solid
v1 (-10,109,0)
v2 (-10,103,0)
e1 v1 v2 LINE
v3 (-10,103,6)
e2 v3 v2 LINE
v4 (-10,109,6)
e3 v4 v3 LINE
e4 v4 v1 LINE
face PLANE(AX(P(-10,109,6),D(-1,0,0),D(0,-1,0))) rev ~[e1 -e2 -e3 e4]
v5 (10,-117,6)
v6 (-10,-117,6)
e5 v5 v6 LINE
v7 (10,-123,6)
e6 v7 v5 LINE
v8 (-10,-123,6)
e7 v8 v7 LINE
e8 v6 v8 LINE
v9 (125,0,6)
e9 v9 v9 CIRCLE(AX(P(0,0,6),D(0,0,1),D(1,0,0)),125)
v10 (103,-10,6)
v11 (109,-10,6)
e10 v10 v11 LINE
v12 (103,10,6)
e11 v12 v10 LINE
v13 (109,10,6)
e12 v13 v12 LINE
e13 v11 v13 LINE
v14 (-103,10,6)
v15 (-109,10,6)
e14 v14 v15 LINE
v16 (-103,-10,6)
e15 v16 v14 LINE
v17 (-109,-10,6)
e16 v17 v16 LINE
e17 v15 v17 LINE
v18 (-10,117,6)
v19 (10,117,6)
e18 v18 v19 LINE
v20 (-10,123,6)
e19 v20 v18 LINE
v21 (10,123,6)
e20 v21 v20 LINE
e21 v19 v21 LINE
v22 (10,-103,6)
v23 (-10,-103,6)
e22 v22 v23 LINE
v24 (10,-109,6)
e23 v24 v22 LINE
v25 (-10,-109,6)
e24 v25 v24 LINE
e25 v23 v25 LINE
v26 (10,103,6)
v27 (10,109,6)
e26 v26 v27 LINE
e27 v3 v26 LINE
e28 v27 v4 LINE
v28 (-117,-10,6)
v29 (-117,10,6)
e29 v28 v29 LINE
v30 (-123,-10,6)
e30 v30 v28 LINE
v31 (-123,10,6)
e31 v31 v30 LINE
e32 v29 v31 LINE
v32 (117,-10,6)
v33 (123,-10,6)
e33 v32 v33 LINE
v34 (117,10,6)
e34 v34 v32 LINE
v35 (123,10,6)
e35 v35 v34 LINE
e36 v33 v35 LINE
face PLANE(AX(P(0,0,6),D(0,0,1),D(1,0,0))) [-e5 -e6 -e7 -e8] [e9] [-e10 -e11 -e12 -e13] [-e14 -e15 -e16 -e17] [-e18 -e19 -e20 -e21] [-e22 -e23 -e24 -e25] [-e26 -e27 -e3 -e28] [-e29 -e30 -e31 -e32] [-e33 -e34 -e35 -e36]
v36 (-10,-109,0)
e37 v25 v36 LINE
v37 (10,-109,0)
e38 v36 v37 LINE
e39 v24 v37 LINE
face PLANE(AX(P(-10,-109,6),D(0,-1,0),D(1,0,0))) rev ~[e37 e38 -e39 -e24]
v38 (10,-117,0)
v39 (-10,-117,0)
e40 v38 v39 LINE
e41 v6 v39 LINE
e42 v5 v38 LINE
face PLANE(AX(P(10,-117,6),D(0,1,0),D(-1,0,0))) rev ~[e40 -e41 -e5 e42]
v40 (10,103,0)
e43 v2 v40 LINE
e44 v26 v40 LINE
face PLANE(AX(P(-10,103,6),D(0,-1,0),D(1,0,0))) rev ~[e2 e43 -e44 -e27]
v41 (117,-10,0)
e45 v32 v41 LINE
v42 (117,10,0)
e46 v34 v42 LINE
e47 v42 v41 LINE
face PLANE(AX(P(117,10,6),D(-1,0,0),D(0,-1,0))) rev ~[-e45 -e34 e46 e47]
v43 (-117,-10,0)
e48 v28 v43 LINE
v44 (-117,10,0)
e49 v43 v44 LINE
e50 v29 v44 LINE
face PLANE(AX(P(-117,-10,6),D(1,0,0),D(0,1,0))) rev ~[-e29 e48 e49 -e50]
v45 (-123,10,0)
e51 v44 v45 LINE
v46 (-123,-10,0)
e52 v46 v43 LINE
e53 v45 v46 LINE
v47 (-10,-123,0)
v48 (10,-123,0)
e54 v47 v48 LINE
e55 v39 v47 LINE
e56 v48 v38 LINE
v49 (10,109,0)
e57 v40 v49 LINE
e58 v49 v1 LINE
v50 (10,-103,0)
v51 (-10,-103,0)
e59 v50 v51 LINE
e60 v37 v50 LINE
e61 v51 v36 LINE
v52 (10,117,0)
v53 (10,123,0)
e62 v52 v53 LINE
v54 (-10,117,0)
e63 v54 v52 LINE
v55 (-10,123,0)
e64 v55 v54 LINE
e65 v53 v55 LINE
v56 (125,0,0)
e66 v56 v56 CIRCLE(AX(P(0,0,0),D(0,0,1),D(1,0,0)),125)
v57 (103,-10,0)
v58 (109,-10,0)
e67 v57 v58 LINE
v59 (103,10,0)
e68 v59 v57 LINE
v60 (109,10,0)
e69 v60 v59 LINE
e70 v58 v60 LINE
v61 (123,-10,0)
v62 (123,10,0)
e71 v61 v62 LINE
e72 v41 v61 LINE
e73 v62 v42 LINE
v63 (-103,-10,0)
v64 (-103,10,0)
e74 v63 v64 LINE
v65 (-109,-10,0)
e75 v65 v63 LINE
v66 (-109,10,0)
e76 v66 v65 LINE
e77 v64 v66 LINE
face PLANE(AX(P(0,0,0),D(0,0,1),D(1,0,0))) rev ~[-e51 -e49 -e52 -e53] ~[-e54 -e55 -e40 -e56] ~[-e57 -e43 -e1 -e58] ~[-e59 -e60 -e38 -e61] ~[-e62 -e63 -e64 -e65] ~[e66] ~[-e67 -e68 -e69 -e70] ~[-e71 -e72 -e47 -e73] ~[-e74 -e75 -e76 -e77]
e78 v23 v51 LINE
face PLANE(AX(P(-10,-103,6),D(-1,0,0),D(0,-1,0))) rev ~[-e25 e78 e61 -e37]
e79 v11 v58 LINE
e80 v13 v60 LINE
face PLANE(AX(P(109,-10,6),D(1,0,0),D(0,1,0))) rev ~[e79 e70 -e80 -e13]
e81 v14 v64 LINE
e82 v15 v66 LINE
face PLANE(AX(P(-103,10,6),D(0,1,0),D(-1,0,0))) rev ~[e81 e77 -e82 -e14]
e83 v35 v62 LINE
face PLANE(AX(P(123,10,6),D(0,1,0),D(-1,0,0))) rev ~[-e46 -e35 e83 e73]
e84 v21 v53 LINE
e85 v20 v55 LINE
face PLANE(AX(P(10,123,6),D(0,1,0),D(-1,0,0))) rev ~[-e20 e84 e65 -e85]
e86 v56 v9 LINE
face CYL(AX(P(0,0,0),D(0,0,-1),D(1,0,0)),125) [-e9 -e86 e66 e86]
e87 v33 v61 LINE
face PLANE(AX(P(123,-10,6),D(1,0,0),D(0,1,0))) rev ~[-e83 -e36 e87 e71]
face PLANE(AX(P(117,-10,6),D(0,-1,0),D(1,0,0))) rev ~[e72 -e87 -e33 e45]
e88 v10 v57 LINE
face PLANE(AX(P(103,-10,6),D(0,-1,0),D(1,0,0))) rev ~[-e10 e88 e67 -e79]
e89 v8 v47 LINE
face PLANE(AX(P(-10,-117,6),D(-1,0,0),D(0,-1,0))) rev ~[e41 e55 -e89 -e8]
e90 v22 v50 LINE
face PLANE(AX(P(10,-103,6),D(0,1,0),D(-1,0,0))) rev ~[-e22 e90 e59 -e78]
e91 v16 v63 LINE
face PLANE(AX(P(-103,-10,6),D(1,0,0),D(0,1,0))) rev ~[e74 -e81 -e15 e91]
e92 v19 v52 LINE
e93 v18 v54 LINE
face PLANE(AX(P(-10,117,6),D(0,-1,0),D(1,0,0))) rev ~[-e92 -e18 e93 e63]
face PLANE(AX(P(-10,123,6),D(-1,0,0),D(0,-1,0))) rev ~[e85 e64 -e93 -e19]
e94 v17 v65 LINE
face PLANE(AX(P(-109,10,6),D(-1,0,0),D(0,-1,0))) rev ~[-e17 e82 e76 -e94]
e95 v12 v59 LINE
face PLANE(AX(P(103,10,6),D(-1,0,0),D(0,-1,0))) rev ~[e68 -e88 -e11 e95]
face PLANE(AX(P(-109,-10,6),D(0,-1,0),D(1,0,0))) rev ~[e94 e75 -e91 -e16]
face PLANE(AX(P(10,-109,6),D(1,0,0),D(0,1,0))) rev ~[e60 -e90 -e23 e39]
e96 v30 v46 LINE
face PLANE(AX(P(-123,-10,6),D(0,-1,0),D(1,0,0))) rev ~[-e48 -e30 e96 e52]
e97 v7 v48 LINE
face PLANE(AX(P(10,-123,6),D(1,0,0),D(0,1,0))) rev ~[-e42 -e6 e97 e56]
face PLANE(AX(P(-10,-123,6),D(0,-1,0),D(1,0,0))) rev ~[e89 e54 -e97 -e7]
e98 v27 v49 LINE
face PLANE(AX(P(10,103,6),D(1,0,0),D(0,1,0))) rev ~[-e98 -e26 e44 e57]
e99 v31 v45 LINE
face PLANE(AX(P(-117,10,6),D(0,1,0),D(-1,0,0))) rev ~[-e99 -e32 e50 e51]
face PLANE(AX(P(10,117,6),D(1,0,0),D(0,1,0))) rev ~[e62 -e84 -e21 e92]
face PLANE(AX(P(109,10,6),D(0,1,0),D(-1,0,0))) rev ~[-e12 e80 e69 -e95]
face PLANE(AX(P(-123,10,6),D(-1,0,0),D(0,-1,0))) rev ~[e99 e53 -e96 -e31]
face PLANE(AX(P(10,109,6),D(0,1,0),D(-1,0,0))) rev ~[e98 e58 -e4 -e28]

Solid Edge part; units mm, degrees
sketch "Sketch1" plane through (0, 0, 0) normal (0, 0, 1) x (1, 0, 0)
  circle A0 centre (0, 0) radius 125
  dimension "D1" = 250
extrude "Protrusion1" add sketch "Sketch1" along normal blind 6
sketch "Sketch2" plane through (3.3435, -13.8996, 6) normal (0, 0, 1) x (1, 0, 0)
  line L0 (-13.3435, 116.8996) -> (6.6565, 116.8996)
  line L1 (6.6565, 116.8996) -> (6.6565, 122.8996)
  line L2 (6.6565, 122.8996) -> (-13.3435, 122.8996)
  line L3 (-13.3435, 122.8996) -> (-13.3435, 116.8996)
  dimension "D1" = 103
  dimension "D2" = 10
extrude "Cutout1" cut sketch "Sketch2" against normal through all
sketch "Sketch3" plane through (0.433, -2.3524, 6) normal (0, 0, 1) x (1, 0, 0)
  line L0 (-10.433, 119.3524) -> (9.567, 119.3524)
  line L1 (9.567, 119.3524) -> (9.567, 125.3524)
  line L2 (9.567, 125.3524) -> (-10.433, 125.3524)
  line L3 (-10.433, 125.3524) -> (-10.433, 119.3524)
  dimension "D1" = 117
extrude "Cutout2" cut sketch "Sketch3" against normal through all
pattern_circular "Pattern1" count 4 over 360 about axis through (0, 0, 6) along (0, 0, -1) of "Cutout2", "Cutout1"
properties material "Wood, Mahogany"
